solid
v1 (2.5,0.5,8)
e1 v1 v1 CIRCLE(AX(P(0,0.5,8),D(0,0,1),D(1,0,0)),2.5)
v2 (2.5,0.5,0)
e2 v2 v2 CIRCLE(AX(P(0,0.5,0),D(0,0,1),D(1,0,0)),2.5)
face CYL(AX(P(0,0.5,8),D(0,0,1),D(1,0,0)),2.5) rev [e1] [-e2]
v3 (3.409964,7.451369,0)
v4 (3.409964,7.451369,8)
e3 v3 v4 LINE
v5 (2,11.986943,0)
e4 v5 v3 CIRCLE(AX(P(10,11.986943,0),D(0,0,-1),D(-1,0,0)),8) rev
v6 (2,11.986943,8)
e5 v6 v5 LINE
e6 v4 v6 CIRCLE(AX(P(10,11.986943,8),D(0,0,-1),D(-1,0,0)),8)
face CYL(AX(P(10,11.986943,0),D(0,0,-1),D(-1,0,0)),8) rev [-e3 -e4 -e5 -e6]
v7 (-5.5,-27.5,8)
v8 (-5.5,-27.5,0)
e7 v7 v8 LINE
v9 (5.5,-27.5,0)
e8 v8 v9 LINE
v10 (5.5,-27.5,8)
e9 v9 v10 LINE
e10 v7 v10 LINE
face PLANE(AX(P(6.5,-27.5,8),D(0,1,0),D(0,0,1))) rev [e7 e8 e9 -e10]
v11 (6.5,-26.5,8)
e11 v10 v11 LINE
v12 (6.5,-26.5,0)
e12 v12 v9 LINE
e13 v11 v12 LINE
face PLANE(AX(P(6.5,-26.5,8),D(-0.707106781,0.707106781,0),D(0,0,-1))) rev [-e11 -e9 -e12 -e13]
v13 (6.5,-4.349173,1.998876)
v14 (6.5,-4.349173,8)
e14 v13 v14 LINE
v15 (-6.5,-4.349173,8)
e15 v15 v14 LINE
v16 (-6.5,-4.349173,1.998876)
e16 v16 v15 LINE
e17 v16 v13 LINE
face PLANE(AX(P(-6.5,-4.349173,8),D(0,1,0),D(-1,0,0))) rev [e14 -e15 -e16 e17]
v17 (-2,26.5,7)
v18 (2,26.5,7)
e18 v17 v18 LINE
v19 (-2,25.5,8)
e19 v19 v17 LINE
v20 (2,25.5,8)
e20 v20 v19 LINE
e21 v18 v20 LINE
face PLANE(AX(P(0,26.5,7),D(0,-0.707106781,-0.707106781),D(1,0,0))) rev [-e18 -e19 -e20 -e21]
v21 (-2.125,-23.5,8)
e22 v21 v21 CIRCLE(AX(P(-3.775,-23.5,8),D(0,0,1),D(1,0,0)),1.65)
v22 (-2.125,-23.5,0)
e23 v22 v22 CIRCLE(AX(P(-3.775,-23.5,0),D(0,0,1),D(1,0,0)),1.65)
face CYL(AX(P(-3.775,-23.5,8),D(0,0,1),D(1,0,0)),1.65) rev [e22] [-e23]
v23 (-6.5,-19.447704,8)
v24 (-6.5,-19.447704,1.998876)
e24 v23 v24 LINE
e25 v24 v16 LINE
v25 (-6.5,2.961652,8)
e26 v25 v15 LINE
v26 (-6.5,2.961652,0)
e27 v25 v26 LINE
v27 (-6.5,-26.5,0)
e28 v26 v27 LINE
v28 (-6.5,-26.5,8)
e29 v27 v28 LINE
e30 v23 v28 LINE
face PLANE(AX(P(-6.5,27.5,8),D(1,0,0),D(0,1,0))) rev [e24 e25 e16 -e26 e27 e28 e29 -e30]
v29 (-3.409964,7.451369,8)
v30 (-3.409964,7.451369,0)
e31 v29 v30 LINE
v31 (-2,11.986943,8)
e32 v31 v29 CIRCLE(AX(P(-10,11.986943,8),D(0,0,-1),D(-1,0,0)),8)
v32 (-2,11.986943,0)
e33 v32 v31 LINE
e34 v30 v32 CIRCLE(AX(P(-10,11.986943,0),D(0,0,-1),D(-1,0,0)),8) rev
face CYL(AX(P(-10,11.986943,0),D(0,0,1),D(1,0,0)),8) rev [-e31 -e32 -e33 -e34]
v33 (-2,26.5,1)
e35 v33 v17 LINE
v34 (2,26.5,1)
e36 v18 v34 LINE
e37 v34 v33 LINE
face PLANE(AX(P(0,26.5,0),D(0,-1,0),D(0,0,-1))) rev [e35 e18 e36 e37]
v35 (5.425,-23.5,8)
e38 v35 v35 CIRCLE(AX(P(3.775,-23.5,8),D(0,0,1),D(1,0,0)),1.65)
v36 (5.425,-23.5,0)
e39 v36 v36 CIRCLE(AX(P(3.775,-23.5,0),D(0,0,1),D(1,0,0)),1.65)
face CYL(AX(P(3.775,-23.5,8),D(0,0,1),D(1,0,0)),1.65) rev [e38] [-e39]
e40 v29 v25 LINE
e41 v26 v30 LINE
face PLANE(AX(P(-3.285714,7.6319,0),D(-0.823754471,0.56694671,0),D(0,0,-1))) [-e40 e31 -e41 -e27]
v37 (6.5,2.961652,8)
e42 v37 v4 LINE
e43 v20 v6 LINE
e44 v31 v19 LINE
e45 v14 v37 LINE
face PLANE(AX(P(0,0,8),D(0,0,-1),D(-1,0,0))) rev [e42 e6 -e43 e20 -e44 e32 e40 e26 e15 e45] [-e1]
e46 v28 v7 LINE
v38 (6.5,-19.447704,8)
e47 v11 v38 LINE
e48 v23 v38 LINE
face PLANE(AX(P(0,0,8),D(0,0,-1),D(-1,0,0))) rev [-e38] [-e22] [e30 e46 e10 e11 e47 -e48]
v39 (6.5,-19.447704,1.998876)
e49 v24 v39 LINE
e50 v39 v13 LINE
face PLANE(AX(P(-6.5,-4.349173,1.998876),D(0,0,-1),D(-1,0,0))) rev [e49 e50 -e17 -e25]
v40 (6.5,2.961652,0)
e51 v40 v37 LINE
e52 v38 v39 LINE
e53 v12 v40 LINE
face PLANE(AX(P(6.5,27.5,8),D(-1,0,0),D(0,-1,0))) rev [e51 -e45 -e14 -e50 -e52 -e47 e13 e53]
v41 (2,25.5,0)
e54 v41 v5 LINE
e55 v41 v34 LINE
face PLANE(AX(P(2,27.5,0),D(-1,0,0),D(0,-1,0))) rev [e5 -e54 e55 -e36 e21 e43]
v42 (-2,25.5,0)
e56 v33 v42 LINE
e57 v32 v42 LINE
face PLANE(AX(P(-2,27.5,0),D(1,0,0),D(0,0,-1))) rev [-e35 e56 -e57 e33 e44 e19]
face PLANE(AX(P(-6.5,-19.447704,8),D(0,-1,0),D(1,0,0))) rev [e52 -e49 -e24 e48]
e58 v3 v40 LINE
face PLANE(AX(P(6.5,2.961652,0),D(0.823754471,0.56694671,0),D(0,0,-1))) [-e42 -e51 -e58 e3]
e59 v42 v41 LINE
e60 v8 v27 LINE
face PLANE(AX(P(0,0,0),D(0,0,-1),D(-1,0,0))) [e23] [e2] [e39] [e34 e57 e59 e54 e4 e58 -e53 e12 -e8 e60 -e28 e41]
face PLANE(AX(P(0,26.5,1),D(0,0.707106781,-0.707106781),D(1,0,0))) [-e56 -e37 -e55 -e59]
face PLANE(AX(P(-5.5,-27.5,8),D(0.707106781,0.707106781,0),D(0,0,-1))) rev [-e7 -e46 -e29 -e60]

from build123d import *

# Parameters (mm, degrees)
ESQUISSE1_W                             = 13
ESQUISSE1_H                             = 55
BOSS_EXTRU_1_DEPTH                      = 8
TROUS_DE_CENTRAGE_5_0MMTRANSITIONAL_1_D = 5
ESQUISSE4_W                             = 4.5
ESQUISSE4_H                             = 20
ENL_V_MAT_EXTRU_1_DEPTH                 = 30.368350311
CONG_1_R                                = 2
CHANFREIN1_SIZE                         = 1
TROU_TARAUD_M41_D                       = 3.3
CHANFREIN2_START                        = -1
CHANFREIN2_DEPTH                        = 10
ESQUISSE9_W                             = 8
ESQUISSE9_H                             = 8
ENL_V_MAT_EXTRU_2_DEPTH                 = 30.874738493
ESQUISSE10_W                            = 4
ESQUISSE10_H                            = 8
BOSS_EXTRU_2_DEPTH                      = 7
CHANFREIN3_SIZE                         = 1
BOSS_EXTRU_3_START                      = -8
BOSS_EXTRU_3_DEPTH                      = 8
CONG_2_R                                = 8
ESQUISSE12_W                            = 6.001123603
ESQUISSE12_H                            = 15.09853113
ENL_V_MAT_EXTRU_3_DEPTH                 = 32.452345059


with BuildPart() as part:
    # Esquisse1 → Boss.-Extru.1 (new body)
    with BuildSketch(Plane.XY):
        Rectangle(ESQUISSE1_W, ESQUISSE1_H)
    extrude(amount=BOSS_EXTRU_1_DEPTH)

    # Trous de centrage Ø5.0mmTransitional 1 (through all)
    with Locations(Plane.XY.offset(8)):
        with Locations((0, 0.5)):
            Hole(TROUS_DE_CENTRAGE_5_0MMTRANSITIONAL_1_D / 2)

    # Esquisse4 → Enlèv. mat.-Extru.1 (cut, through all)
    with BuildSketch(Plane.XY.offset(8)):
        with Locations((4.25, 17.5)):
            Rectangle(ESQUISSE4_W, ESQUISSE4_H)
        with Locations((-4.25, 17.5)):
            Rectangle(ESQUISSE4_W, ESQUISSE4_H)
    extrude(amount=-ENL_V_MAT_EXTRU_1_DEPTH, mode=Mode.SUBTRACT)

    # Congé1
    cong_1_edges = [part.edges().sort_by_distance(p)[0] for p in [
        (2, 7.5, 4),
        (-2, 7.5, 4),
    ]]
    fillet(cong_1_edges, radius=CONG_1_R)

    # Chanfrein1
    chanfrein1_edges = [part.edges().sort_by_distance(p)[0] for p in [
        (6.5, -27.5, 4),
        (-6.5, -27.5, 4),
    ]]
    chamfer(chanfrein1_edges, length=CHANFREIN1_SIZE)

    # Trou taraudé M41 (through all)
    with Locations(Plane.XY.offset(8)):
        with Locations((-3.775, -23.5), (3.775, -23.5)):
            Hole(TROU_TARAUD_M41_D / 2)

    # Chanfrein2: read off the stored shape, not the designer's step
    # Chanfrein2 outline → Chanfrein2 (cut)
    with BuildSketch(Plane.XY.offset(CHANFREIN2_START)):
        with BuildLine():
            Line((3.285714286, 7.631900453), (6.5, 2.961651585))
            Line((6.5, 2.961651585), (6.5, 7.5))
            Line((6.5, 7.5), (4, 7.5))
            ThreePointArc((4, 7.5), (3.636818981, 7.533251529), (3.285714286, 7.631900453))
        make_face()
        with BuildLine():
            Line((-6.5, 2.961651585), (-3.285714286, 7.631900453))
            ThreePointArc((-3.285714286, 7.631900453), (-3.636818981, 7.533251529), (-4, 7.5))
            Line((-4, 7.5), (-6.5, 7.5))
            Line((-6.5, 7.5), (-6.5, 2.961651585))
        make_face()
    extrude(amount=CHANFREIN2_DEPTH, mode=Mode.SUBTRACT)

    # Esquisse9 → Enlèv. mat.-Extru.2 (cut, through all)
    with BuildSketch(Plane.ZY.offset(2)):
        with Locations((4, 23.5)):
            Rectangle(ESQUISSE9_W, ESQUISSE9_H)
    extrude(amount=-ENL_V_MAT_EXTRU_2_DEPTH, mode=Mode.SUBTRACT)

    # Esquisse10 → Boss.-Extru.2 (add)
    with BuildSketch(Plane(origin=(0, 19.5, 0), x_dir=(1, 0, 0), z_dir=(0, 1, 0))):
        with Locations((0, -4)):
            Rectangle(ESQUISSE10_W, ESQUISSE10_H)
    extrude(amount=BOSS_EXTRU_2_DEPTH)

    # Chanfrein3
    chanfrein3_edges = [part.edges().sort_by_distance(p)[0] for p in [
        (0, 26.5, 0),
        (0, 26.5, 8),
    ]]
    chamfer(chanfrein3_edges, length=CHANFREIN3_SIZE)

    # Esquisse11 → Boss.-Extru.3 (add)
    with BuildSketch(Plane.XY.offset(8).offset(BOSS_EXTRU_3_START)):
        with BuildLine():
            Line((-3.285714286, 7.631900453), (-2, 9.5))
            ThreePointArc((-2, 9.5), (-2.352491058, 8.366106581), (-3.285714286, 7.631900453))
        make_face()
        with BuildLine():
            Line((3.285714286, 7.631900453), (2, 9.5))
            ThreePointArc((2, 9.5), (2.352491058, 8.366106581), (3.285714286, 7.631900453))
        make_face()
    extrude(amount=BOSS_EXTRU_3_DEPTH)

    # Congé2
    cong_2_edges = [part.edges().sort_by_distance(p)[0] for p in [
        (-2, 9.5, 4),
        (2, 9.5, 4),
    ]]
    fillet(cong_2_edges, radius=CONG_2_R)

    # Esquisse12 → Enlèv. mat.-Extru.3 (cut, through all)
    with BuildSketch(Plane(origin=(6.5, 0, 0), x_dir=(0, 0, -1), z_dir=(1, 0, 0))):
        with Locations((-4.999438199, -11.898438915)):
            Rectangle(ESQUISSE12_W, ESQUISSE12_H)
    extrude(amount=-ENL_V_MAT_EXTRU_3_DEPTH, mode=Mode.SUBTRACT)


solid = part.part
